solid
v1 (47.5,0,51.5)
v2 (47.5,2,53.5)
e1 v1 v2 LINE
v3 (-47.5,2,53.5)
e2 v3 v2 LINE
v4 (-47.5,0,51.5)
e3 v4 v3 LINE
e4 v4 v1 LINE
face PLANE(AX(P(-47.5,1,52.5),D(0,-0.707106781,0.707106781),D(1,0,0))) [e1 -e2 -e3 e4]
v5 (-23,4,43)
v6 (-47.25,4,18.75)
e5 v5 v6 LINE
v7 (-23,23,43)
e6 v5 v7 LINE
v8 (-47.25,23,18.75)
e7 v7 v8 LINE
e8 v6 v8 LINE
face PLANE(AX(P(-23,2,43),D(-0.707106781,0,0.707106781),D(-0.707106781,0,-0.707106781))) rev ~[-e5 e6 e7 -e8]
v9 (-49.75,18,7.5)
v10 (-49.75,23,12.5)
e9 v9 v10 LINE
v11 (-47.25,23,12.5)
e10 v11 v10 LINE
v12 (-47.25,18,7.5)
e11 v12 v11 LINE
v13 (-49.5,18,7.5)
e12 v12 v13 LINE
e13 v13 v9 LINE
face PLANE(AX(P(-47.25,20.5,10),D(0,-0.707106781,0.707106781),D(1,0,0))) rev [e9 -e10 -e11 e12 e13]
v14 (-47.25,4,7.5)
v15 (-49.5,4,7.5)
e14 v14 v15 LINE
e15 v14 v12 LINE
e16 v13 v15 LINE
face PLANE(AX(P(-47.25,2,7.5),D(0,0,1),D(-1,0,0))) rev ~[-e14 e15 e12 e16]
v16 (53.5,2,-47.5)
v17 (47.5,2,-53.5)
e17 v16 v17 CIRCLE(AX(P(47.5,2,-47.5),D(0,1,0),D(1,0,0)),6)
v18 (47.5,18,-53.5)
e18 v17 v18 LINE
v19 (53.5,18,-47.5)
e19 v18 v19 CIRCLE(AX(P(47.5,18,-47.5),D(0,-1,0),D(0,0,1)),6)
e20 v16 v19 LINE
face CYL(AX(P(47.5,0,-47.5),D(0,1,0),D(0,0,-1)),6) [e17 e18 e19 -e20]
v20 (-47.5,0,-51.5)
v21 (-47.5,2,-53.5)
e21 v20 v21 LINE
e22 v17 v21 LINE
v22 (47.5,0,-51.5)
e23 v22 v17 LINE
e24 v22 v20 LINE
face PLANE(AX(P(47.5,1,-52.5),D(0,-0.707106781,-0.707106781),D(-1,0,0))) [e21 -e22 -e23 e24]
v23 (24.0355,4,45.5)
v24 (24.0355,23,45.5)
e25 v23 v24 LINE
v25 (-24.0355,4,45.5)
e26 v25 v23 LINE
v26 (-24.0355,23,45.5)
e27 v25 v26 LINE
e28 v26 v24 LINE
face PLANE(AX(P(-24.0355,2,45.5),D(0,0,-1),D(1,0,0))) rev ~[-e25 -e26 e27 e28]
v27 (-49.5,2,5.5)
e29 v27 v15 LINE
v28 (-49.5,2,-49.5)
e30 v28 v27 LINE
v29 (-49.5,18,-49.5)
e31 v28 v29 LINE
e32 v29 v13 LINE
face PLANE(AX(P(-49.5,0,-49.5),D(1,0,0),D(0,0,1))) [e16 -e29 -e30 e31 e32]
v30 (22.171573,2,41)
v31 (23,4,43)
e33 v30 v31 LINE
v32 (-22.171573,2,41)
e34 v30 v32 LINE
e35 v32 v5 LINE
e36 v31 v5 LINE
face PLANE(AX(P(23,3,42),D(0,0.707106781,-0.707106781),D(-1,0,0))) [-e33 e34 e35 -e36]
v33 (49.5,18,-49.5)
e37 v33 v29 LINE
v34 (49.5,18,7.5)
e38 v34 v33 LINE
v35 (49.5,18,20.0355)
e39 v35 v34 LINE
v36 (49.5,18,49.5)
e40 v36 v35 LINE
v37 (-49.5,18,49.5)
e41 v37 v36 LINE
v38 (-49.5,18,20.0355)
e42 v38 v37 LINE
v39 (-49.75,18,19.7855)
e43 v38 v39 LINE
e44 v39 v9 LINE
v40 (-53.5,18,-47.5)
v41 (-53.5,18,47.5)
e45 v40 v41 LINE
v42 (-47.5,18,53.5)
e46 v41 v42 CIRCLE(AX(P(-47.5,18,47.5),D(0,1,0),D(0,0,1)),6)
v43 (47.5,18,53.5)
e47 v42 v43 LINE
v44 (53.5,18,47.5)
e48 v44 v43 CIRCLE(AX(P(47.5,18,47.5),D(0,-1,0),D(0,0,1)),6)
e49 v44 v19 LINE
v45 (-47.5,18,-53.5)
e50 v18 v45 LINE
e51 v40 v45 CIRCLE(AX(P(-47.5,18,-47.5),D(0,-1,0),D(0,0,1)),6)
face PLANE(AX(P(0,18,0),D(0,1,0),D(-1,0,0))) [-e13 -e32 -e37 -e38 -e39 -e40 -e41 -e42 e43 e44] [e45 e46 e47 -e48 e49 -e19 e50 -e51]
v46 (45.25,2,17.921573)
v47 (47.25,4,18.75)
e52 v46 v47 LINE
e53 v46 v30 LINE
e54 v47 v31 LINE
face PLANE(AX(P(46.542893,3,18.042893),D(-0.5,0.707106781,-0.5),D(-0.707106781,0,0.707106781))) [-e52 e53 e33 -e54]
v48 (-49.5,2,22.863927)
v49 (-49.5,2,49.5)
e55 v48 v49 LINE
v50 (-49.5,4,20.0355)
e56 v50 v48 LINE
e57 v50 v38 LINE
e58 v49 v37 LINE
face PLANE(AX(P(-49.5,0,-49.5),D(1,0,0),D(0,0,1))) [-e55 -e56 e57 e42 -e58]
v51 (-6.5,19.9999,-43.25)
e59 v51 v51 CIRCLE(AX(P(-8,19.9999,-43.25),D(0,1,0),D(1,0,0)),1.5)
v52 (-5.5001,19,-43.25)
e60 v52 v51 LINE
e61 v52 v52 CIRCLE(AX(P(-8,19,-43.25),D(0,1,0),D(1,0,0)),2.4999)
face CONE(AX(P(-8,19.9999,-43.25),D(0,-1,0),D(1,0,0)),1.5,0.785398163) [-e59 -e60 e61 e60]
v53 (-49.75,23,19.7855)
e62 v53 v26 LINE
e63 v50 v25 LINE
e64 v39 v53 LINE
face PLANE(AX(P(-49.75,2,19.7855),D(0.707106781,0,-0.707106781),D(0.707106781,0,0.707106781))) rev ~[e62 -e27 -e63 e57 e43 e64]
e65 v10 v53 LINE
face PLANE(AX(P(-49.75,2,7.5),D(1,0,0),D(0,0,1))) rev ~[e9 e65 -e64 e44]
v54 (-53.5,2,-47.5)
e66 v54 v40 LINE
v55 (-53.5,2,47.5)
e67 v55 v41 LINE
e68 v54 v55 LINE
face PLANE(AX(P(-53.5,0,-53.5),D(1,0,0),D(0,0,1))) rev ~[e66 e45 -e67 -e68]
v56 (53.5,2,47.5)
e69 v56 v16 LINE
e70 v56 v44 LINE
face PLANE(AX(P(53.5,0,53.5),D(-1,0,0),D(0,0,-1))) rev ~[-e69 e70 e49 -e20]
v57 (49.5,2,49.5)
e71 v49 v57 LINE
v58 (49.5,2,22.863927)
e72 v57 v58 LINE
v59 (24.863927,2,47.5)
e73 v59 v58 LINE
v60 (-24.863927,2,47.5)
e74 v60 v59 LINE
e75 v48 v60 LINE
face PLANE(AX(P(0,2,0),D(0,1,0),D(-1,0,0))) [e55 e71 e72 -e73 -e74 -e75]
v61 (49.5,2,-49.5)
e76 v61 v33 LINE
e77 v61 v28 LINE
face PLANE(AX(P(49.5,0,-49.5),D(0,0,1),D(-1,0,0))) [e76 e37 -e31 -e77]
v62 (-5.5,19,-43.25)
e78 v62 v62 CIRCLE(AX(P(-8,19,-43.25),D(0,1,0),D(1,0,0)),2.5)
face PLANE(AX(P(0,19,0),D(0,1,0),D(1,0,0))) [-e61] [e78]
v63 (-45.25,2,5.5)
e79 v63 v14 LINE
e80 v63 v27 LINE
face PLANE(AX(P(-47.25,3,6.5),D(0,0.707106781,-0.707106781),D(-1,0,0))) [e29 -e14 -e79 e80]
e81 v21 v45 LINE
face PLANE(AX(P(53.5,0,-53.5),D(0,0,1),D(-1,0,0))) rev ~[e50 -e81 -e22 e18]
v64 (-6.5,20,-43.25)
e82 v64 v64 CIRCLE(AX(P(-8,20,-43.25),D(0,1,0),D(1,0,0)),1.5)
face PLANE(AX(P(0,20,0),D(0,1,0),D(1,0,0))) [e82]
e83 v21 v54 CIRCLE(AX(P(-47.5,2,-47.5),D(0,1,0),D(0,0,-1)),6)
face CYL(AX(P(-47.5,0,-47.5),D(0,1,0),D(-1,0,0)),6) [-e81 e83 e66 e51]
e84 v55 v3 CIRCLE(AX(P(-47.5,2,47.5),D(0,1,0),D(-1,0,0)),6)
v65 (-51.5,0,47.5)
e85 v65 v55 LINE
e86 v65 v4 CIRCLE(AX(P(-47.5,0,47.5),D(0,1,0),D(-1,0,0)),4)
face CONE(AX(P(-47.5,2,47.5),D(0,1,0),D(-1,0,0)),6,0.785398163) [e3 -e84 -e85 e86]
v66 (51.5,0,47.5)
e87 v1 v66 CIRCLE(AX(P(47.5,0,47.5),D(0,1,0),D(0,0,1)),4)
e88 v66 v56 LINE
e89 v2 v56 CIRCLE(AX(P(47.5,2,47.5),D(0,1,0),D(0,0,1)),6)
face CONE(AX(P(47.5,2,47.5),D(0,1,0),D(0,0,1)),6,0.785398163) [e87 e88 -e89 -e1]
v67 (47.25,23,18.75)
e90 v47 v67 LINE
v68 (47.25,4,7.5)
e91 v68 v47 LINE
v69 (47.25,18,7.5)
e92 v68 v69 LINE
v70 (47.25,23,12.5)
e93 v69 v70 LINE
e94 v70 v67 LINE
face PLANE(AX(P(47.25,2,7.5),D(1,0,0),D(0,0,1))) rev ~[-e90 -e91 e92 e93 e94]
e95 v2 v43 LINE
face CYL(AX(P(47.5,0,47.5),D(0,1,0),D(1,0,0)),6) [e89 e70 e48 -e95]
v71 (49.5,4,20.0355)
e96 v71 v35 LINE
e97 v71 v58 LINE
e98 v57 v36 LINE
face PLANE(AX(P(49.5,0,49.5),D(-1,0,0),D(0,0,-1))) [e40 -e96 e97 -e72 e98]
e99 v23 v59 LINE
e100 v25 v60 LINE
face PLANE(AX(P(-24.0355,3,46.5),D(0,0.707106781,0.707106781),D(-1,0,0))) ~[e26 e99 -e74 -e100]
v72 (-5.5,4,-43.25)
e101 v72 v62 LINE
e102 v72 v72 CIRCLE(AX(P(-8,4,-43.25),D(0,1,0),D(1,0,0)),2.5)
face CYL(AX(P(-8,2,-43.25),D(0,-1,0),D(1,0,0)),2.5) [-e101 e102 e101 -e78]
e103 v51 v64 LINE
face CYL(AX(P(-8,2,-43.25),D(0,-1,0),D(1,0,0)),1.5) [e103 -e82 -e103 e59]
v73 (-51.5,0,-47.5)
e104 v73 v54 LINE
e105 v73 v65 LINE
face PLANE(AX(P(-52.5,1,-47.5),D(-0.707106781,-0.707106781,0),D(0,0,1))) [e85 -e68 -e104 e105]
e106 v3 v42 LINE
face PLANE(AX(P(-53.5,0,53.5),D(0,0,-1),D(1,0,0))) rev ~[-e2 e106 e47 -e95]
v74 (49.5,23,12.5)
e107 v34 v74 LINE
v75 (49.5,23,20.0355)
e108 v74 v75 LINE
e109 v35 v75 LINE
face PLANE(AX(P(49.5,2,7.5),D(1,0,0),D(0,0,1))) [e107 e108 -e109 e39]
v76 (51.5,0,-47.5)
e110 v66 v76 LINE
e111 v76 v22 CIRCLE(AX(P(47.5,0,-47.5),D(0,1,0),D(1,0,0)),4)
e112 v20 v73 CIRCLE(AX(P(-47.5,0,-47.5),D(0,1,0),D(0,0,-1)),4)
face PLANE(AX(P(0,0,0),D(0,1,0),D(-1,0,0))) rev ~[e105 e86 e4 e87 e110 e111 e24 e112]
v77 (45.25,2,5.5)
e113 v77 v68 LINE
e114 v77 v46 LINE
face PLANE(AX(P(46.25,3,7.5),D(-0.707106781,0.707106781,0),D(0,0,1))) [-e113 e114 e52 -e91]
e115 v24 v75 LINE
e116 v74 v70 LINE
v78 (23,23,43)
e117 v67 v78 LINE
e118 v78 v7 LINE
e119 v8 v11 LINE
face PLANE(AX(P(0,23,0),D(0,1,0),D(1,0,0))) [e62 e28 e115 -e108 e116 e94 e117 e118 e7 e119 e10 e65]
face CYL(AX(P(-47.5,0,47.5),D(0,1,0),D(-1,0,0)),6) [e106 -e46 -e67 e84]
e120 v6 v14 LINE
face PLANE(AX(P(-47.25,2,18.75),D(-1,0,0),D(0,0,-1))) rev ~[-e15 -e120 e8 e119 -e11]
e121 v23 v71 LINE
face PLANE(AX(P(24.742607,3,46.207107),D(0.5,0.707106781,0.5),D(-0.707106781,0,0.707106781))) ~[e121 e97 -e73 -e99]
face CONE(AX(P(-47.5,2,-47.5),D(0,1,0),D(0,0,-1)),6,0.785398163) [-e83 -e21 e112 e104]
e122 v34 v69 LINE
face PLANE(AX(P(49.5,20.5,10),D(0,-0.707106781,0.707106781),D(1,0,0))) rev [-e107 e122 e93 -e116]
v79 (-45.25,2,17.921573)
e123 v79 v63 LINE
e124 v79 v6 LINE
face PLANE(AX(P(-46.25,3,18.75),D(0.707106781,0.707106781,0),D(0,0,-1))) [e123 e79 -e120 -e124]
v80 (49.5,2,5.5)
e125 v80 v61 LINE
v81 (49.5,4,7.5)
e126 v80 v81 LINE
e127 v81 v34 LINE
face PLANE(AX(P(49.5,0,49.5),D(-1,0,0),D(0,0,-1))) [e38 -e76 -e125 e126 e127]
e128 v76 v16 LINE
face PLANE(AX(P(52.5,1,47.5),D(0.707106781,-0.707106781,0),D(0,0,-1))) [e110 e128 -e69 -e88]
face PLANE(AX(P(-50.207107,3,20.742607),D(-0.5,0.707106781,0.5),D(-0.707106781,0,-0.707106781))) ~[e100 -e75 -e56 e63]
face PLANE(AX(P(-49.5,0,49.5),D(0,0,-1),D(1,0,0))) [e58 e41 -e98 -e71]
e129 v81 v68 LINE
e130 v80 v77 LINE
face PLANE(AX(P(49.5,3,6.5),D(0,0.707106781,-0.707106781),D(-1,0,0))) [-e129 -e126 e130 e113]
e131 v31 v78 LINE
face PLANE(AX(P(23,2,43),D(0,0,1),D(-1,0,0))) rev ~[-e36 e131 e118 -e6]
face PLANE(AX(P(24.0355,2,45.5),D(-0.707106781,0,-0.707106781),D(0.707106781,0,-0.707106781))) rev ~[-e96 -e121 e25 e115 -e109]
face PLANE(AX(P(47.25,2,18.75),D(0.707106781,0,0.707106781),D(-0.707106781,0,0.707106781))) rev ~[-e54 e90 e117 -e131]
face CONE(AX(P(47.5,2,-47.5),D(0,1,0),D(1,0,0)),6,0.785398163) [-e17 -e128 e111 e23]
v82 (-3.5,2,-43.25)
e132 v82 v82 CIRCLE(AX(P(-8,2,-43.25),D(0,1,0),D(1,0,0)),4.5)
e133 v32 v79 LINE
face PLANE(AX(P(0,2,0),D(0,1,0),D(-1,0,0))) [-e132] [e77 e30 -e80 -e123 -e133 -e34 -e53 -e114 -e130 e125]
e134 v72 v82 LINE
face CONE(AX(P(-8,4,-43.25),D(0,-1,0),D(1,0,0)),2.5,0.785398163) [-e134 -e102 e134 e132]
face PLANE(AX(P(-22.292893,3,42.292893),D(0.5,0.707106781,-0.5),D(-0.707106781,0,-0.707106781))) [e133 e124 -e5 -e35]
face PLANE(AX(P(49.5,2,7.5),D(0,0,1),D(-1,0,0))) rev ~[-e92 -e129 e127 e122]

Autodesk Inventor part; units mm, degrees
ref_plane "YZ Plane" through (0, 0, 0) normal (1, 0, 0) x (0, 1, 0)
ref_plane "XZ Plane" through (0, 0, 0) normal (0, 1, 0) x (-1, 0, 0)
ref_plane "XY Plane" through (0, 0, 0) normal (0, 0, 1) x (1, 0, 0)
sketch "Náčrt1" plane through (0, 0, 0) normal (0, 1, 0) x (-1, 0, 0)
  line L0 (49.5, 49.5) -> (-49.5, 49.5)
  line L1 (-49.5, 49.5) -> (-49.5, -49.5)
  line L2 (-49.5, -49.5) -> (49.5, -49.5)
  line L3 (49.5, -49.5) -> (49.5, 49.5)
  line L4 (49.5, 49.5) -> (-49.5, -49.5) construction
  line L5 (-49.5, 49.5) -> (49.5, -49.5) construction
  line L6 (53.5, 53.5) -> (-53.5, 53.5)
  line L7 (-53.5, 53.5) -> (-53.5, -53.5)
  line L8 (-53.5, -53.5) -> (53.5, -53.5)
  line L9 (53.5, -53.5) -> (53.5, 53.5)
  line L10 (53.5, 53.5) -> (-53.5, -53.5) construction
  line L11 (-53.5, 53.5) -> (53.5, -53.5) construction
  point P0 (0, 0)
  dimension "d1" = 99
  dimension "d2" = 4
extrude "Vysunutí1" add sketch "Náčrt1" along normal blind 2 contours L3 L2 L1 L0
extrude "Vysunutí2" add sketch "Náčrt1" along normal blind 18
fillet "Zaoblení1" radius 6 4 edges at (53.5, 9, 53.5) (53.5, 9, -53.5) (-53.5, 9, -53.5) (-53.5, 9, 53.5)
chamfer "Zkosení1" distance 2 angle 45 8 edges at (0, 0, 53.5) (51.7426, 0, 51.7426) (53.5, 0, 0) (51.7426, 0, -51.7426) (0, 0, -53.5) (-51.7426, 0, -51.7426) (-53.5, 0, 0) (-51.7426, 0, 51.7426)
sketch "Náčrt2" plane through (0, 2, 0) normal (0, 1, 0) x (1, 0, 0)
  line L0 (47.25, -18.75) -> (23, -43)
  line L1 (23, -43) -> (-23, -43)
  line L2 (-23, -43) -> (-47.25, -18.75)
  line L3 (-49.75, -19.7855) -> (-24.0355, -45.5)
  line L4 (-24.0355, -45.5) -> (24.0355, -45.5)
  line L5 (24.0355, -45.5) -> (49.75, -19.7855)
  line L6 (49.75, -19.7855) -> (49.75, -7.5)
  line L7 (49.75, -7.5) -> (47.25, -7.5)
  line L8 (47.25, -7.5) -> (47.25, -18.75)
  line L9 (-47.25, -18.75) -> (-47.25, -7.5)
  line L10 (-47.25, -7.5) -> (-49.75, -7.5)
  line L11 (-49.75, -7.5) -> (-49.75, -19.7855)
  line L12 (49.5, -49.5) -> (-49.5, -49.5) projected
  line L13 (49.5, 49.5) -> (49.5, -49.5) projected
  point P0 (0, 0)
  point P1 (0, -45.5)
  point P2 (0, -49.5)
  point P3 (49.5, -20.0355)
  point P4 (49.5, -7.5)
  dimension "d12" = 2.5
  dimension "d13" = 2.5
  dimension "d14" = 2.5
  dimension "d15" = 46
  dimension "d16" = 135
  dimension "d17" = 2.5
  dimension "d18" = 2.5
  dimension "d19" = 38
  dimension "d20" = 99.5
  dimension "d21" = 11.25
  dimension "d22" = 4
extrude "Vysunutí3" add sketch "Náčrt2" along normal blind 21 contours L8 L7 L13 L5 L4 L3 L11 L10 L9 L2 L1 L0
sketch "Náčrt3" plane through (0, 2, 0) normal (0, 1, 0) x (1, 0, 0)
  circle A0 centre (-8, 43.25) radius 2.5
  circle A1 centre (-8, 43.25) radius 1.5
  line L0 (49.5, 49.5) -> (49.5, -7.5) projected
  line L1 (-49.5, -7.5) -> (-49.5, 49.5) projected
  line L2 (-49.5, 49.5) -> (49.5, 49.5) projected
  point P0 (0, 0)
  dimension "d27" = 3
  dimension "d28" = 5
  dimension "d39" = 41.5
  dimension "d43" = 6.25
extrude "Vysunutí4" add sketch "Náčrt3" along normal blind 18 contours A1
extrude "Vysunutí5" add sketch "Náčrt3" along normal blind 17
chamfer "Zkosení2" distance 1 angle 45 1 edges at (-9.5, 19, -43.25)
chamfer "Zkosení3" distance 2 angle 45 11 edges at (-10.5, 2, -43.25) (-35.125, 2, 30.875) (-47.25, 2, 13.125) (0, 2, 43) (35.125, 2, 30.875) (47.25, 2, 13.125) (48.375, 2, 7.5) (-48.375, 2, 7.5) (36.7678, 2, 32.7678) (0, 2, 45.5) (-36.7678, 2, 32.7678)
chamfer "Zkosení4" distance 5 angle 45 2 edges at (-48.5, 23, 7.5) (48.375, 23, 7.5)
properties part number "horni_vlozka"
